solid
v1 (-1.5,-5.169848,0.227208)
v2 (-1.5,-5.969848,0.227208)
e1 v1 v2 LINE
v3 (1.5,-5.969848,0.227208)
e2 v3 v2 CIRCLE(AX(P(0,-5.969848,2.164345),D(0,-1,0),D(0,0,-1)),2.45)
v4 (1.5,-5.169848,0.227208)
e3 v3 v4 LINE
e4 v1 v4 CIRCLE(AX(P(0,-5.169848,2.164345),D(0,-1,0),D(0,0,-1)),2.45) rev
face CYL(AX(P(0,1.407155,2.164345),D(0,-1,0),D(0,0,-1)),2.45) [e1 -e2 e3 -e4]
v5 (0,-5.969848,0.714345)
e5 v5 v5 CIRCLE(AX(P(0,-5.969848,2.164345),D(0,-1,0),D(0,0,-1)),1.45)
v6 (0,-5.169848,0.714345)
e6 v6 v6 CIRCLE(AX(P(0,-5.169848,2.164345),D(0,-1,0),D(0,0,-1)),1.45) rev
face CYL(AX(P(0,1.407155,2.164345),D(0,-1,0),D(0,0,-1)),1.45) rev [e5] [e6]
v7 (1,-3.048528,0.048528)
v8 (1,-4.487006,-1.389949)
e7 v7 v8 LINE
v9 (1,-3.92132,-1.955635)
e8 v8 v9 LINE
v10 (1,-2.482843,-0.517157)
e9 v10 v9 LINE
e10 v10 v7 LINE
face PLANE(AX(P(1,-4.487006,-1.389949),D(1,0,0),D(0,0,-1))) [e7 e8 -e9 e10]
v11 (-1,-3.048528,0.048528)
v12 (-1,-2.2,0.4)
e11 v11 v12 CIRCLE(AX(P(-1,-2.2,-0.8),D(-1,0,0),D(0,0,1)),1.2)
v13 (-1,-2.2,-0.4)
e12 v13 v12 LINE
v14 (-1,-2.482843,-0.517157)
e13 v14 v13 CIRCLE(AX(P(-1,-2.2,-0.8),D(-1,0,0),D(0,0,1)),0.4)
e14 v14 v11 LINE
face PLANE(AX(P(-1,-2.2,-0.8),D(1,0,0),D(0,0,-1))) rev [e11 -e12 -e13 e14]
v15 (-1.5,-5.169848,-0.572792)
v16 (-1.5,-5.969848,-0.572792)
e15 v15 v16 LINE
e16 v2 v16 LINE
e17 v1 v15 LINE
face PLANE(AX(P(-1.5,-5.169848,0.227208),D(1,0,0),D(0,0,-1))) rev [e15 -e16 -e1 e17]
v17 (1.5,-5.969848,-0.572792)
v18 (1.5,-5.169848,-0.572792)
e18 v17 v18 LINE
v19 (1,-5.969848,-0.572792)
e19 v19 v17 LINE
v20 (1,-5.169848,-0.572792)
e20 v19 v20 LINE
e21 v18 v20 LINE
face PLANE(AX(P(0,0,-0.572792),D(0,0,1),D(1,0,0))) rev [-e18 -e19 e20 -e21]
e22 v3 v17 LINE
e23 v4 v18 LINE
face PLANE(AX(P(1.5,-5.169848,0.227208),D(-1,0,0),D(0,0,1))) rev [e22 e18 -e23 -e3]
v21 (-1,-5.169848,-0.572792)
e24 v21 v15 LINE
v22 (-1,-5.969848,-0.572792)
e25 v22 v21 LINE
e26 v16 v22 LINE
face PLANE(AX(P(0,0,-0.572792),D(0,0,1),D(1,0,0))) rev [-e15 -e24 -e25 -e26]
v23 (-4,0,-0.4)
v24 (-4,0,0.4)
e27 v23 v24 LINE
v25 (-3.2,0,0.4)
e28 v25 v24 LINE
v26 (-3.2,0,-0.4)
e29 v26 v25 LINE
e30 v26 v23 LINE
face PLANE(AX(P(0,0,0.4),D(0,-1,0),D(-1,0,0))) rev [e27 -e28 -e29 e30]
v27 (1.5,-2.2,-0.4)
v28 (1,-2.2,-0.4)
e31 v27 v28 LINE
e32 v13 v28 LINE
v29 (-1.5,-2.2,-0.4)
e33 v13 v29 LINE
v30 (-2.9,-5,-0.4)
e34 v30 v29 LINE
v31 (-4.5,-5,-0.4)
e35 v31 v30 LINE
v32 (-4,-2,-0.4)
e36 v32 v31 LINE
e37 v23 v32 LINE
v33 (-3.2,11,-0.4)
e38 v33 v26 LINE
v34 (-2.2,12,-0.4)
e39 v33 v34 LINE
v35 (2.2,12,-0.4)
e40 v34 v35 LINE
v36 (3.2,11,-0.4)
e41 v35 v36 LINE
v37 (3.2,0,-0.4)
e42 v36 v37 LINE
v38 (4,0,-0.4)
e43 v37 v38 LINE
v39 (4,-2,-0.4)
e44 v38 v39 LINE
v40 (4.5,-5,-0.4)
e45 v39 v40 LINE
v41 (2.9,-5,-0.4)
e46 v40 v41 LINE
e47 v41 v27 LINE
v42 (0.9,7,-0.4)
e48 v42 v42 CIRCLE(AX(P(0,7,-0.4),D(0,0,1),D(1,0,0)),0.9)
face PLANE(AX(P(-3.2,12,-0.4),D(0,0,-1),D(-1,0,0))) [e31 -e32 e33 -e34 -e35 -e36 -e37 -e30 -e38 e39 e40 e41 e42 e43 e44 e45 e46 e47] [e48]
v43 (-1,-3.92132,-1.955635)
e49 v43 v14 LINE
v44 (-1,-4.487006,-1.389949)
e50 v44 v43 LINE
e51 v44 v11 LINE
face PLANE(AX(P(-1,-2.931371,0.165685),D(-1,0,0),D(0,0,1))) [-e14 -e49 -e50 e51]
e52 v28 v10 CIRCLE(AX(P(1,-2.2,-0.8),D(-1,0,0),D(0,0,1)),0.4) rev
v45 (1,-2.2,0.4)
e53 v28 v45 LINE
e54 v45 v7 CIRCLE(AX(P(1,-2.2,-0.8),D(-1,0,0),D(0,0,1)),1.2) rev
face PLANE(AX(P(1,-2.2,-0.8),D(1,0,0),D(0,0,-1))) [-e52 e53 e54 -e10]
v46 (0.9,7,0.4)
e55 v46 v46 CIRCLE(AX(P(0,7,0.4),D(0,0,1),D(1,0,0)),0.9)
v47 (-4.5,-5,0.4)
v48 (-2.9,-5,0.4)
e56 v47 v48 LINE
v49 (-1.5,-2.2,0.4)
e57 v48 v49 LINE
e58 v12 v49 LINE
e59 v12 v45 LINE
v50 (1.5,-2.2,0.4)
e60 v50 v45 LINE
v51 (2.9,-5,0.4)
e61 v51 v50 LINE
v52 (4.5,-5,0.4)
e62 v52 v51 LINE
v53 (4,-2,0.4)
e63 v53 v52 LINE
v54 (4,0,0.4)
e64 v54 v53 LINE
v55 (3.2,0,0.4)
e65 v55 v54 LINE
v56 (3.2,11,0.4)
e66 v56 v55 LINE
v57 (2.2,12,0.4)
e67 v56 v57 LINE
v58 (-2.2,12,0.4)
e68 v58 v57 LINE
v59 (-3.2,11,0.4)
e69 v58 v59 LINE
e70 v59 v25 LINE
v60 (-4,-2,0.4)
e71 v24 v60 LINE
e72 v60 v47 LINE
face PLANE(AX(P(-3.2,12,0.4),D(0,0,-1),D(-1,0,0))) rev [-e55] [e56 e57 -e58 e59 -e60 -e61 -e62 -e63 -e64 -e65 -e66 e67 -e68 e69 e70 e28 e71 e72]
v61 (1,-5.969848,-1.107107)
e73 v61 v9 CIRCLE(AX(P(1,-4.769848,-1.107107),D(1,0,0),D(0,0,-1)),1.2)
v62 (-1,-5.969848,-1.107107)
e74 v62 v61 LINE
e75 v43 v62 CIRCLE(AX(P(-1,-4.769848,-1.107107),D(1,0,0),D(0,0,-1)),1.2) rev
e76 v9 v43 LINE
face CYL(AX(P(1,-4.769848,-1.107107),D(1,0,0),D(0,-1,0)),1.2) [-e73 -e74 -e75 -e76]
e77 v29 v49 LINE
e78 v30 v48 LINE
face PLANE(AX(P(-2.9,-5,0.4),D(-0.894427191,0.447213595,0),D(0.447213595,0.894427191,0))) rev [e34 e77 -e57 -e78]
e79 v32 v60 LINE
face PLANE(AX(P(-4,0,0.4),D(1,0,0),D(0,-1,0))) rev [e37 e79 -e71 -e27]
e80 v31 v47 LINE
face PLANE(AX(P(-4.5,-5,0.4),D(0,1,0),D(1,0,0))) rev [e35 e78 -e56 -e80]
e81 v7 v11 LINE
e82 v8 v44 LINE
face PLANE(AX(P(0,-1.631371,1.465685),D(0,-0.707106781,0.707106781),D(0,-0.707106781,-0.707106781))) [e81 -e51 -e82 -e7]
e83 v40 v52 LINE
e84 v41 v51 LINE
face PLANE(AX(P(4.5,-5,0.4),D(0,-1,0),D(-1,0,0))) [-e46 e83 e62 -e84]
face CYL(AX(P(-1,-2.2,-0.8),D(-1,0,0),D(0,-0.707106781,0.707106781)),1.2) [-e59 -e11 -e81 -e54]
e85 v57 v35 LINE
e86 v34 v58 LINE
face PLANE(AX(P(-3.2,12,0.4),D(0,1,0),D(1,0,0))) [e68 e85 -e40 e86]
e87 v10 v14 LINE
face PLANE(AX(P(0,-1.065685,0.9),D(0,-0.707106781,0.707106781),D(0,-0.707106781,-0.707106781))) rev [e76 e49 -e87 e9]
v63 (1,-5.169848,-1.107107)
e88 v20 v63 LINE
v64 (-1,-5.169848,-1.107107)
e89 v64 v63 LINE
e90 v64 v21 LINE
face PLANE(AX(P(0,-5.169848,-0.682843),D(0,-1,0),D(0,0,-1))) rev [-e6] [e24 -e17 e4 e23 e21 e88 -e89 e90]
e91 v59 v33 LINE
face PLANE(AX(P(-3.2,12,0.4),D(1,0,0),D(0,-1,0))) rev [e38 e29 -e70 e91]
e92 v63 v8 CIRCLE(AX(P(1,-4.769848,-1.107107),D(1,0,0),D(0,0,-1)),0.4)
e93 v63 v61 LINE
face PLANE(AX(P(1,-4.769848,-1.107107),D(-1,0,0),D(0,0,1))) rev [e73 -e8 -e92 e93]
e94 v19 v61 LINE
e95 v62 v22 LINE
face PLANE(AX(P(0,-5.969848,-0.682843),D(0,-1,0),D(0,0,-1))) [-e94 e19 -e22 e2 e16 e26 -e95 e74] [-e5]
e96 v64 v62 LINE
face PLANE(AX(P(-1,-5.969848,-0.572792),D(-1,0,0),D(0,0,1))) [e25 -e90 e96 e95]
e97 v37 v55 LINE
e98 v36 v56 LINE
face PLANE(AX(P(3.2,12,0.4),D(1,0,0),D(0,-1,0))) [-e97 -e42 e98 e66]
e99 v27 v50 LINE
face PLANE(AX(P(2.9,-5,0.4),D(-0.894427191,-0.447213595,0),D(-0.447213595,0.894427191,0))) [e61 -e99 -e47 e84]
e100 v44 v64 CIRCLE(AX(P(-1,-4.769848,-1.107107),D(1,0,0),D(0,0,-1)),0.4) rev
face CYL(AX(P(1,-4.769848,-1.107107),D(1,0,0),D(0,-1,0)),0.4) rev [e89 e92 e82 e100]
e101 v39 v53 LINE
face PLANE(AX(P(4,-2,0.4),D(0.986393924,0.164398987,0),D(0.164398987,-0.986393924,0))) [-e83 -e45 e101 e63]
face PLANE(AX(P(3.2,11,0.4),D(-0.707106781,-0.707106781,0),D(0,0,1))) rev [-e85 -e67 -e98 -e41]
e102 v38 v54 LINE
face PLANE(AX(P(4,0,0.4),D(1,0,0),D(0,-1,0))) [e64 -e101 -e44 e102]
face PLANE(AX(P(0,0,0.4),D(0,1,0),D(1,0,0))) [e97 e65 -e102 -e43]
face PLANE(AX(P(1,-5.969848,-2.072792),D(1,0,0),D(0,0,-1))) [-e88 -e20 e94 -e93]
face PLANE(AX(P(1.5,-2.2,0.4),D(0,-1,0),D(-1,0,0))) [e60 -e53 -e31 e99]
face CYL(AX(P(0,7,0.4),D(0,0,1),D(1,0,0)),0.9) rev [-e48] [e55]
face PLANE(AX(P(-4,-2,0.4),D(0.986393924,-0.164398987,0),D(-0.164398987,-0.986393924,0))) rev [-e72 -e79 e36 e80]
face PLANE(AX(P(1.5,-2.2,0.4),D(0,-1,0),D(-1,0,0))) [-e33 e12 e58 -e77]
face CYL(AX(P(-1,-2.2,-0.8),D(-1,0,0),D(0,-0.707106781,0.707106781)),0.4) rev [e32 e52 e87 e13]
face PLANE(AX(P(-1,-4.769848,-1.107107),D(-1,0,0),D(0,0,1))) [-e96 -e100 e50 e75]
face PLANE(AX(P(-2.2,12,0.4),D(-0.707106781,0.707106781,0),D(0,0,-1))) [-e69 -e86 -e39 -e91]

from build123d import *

# Parameters (mm, degrees)
MAINBODYS_W                           = 6.4
MAINBODYS_H                           = 0.8
MAIN_BODY_DEPTH                       = 12
BOTTOM_OF_MAIN_BODY_REACH             = 14.426
BOTTOM_OF_MAIN_BODY_DIRECTION_2_REACH = 14.426
TOPHOLES_R                            = 0.9
TOP_HOLE_DEPTH                        = 13.840950121
F_45_DEGREE_FLANGE_DEPTH              = 2
BOTTOM_FLAT_FLANGE_DEPTH              = 2
EXTENDEDBOTTOMFLANGES_W               = 3
EXTENDEDBOTTOMFLANGES_H               = 0.8
EXTENDED_BOTTOM_FLANGE_DEPTH          = 0.8
BOSSEDCYLINDERBODYS_R                 = 1.45
BOSSED_CYLINDER_BODY_DEPTH            = 0.8
C_MAIN_BODY_SIZE                      = 1


# Sheet-metal steps are written as plain solids
with BuildPart() as part:
    # MainBodyS → MAIN BODY (new body)
    with BuildSketch(Plane(origin=(0, 0, 0), x_dir=(1, 0, 0), z_dir=(0, 1, 0))):
        Rectangle(MAINBODYS_W, MAINBODYS_H)
    extrude(amount=MAIN_BODY_DEPTH)

    # BOTTOM OF MAIN BODY: up to this face of the body (flat: up to its plane)
    bottom_of_main_body_end = Plane(part.part.faces().sort_by_distance((0, 6, 0.4))[0])
    # BottomMainBodyS → BOTTOM OF MAIN BODY (add, up to the picked face)
    with BuildSketch(Plane.XY, mode=Mode.PRIVATE) as bottom_of_main_body_sk1:
        Polygon((0, 0), (4, 0), (4, -2), (4.5, -5), (2.9, -5), (1.5, -2.2), (0, -2.2), align=None)
    bottom_of_main_body_tool1 = split(extrude(bottom_of_main_body_sk1.sketch, amount=BOTTOM_OF_MAIN_BODY_REACH, mode=Mode.PRIVATE), bisect_by=bottom_of_main_body_end, keep=Keep.BOTH, mode=Mode.PRIVATE)
    bottom_of_main_body = bottom_of_main_body_tool1.solids().sort_by(Axis((2.475691, -2.049989, 0), (0, 0, 1)))[0]
    add(bottom_of_main_body)

    # BOTTOM OF MAIN BODY direction 2: up to this face of the body (flat: up to its plane)
    bottom_of_main_body_direction_2_end = Plane(part.part.faces().sort_by_distance((0, 6, -0.4))[0])
    # BottomMainBodyS → BOTTOM OF MAIN BODY direction 2 (add, up to the picked face)
    with BuildSketch(Plane.XY, mode=Mode.PRIVATE) as bottom_of_main_body_direction_2_sk1:
        Polygon((0, 0), (4, 0), (4, -2), (4.5, -5), (2.9, -5), (1.5, -2.2), (0, -2.2), align=None)
    bottom_of_main_body_direction_2_tool1 = split(extrude(bottom_of_main_body_direction_2_sk1.sketch, amount=-BOTTOM_OF_MAIN_BODY_DIRECTION_2_REACH, mode=Mode.PRIVATE), bisect_by=bottom_of_main_body_direction_2_end, keep=Keep.BOTH, mode=Mode.PRIVATE)
    bottom_of_main_body_direction_2 = bottom_of_main_body_direction_2_tool1.solids().sort_by(Axis((2.475691, -2.049989, 0), (0, 0, -1)))[0]
    add(bottom_of_main_body_direction_2)

    # BMB HM: BOTTOM OF MAIN BODY, BOTTOM OF MAIN BODY direction 2 across plane
    add(bottom_of_main_body.mirror(Plane(origin=(0, 0, 0), x_dir=(0, 0, 1), z_dir=(1, 0, 0))))
    add(bottom_of_main_body_direction_2.mirror(Plane(origin=(0, 0, 0), x_dir=(0, 0, 1), z_dir=(1, 0, 0))))

    # TopHoleS → TOP HOLE (cut, through all)
    with BuildSketch(Plane.XY.offset(0.4)):
        with Locations((0, 7)):
            Circle(TOPHOLES_R)
    extrude(amount=-TOP_HOLE_DEPTH, mode=Mode.SUBTRACT)

    # 45 DEGREE FLANGE section (across the edge) → 45 DEGREE FLANGE (add)
    with BuildSketch(Plane(origin=(1, -2.365685425, -0.4), x_dir=(0, 0.7071067811865438, -0.7071067811865512), z_dir=(-1, 0, 0))):
        with BuildLine():
            Line((-0.8, 0.165685425), (-0.8, 2.2))
            Line((-0.8, 2.2), (0, 2.2))
            Line((0, 2.2), (0, 0.165685425))
            ThreePointArc((0, 0.165685425), (0.030448187, 0.012612052), (0.117157288, -0.117157288))
            Line((0.117157288, -0.117157288), (-0.448528137, -0.682842712))
            ThreePointArc((-0.448528137, -0.682842712), (-0.708655439, -0.293534694), (-0.8, 0.165685425))
        make_face()
    extrude(amount=F_45_DEGREE_FLANGE_DEPTH)

    # BOTTOM FLAT FLANGE section (across the edge) → BOTTOM FLAT FLANGE (add)
    with BuildSketch(Plane(origin=(-1, -5.169848481, -2.072792206), x_dir=(0, 1, 0), z_dir=(1, 0, 0))):
        with BuildLine():
            Line((-0.8, 0.965685425), (-0.8, 1.5))
            Line((-0.8, 1.5), (0, 1.5))
            Line((0, 1.5), (0, 0.965685425))
            ThreePointArc((0, 0.965685425), (0.246926627, 0.596133612), (0.682842712, 0.682842712))
            Line((0.682842712, 0.682842712), (1.248528137, 0.117157288))
            ThreePointArc((1.248528137, 0.117157288), (-0.059220119, -0.142970014), (-0.8, 0.965685425))
        make_face()
    extrude(amount=BOTTOM_FLAT_FLANGE_DEPTH)

    # ExtendedBottomFlangeS → EXTENDED BOTTOM FLANGE (add)
    with BuildSketch(Plane.XY.offset(-0.572792206)):
        with Locations((0, -5.569848481)):
            Rectangle(EXTENDEDBOTTOMFLANGES_W, EXTENDEDBOTTOMFLANGES_H)
    extrude(amount=EXTENDED_BOTTOM_FLANGE_DEPTH)

    # BossedCylinderBodyS → BOSSED  CYLINDER BODY (add)
    with BuildSketch(Plane.XZ.offset(5.969848481)):
        with BuildLine():
            Line((-1.5, 0.227207794), (1.5, 0.227207794))
            ThreePointArc((1.5, 0.227207794), (0, 4.614344857), (-1.5, 0.227207794))
        make_face()
        with Locations(Location((0, 2.164344857, 0), (0, 0, 270))):
            Circle(BOSSEDCYLINDERBODYS_R, mode=Mode.SUBTRACT)
    extrude(amount=-BOSSED_CYLINDER_BODY_DEPTH)

    # C MAIN BODY
    c_main_body_edges = [part.edges().sort_by_distance(p)[0] for p in [
        (-3.2, 12, 0),
        (3.2, 12, 0),
    ]]
    chamfer(c_main_body_edges, length=C_MAIN_BODY_SIZE)


solid = part.part
